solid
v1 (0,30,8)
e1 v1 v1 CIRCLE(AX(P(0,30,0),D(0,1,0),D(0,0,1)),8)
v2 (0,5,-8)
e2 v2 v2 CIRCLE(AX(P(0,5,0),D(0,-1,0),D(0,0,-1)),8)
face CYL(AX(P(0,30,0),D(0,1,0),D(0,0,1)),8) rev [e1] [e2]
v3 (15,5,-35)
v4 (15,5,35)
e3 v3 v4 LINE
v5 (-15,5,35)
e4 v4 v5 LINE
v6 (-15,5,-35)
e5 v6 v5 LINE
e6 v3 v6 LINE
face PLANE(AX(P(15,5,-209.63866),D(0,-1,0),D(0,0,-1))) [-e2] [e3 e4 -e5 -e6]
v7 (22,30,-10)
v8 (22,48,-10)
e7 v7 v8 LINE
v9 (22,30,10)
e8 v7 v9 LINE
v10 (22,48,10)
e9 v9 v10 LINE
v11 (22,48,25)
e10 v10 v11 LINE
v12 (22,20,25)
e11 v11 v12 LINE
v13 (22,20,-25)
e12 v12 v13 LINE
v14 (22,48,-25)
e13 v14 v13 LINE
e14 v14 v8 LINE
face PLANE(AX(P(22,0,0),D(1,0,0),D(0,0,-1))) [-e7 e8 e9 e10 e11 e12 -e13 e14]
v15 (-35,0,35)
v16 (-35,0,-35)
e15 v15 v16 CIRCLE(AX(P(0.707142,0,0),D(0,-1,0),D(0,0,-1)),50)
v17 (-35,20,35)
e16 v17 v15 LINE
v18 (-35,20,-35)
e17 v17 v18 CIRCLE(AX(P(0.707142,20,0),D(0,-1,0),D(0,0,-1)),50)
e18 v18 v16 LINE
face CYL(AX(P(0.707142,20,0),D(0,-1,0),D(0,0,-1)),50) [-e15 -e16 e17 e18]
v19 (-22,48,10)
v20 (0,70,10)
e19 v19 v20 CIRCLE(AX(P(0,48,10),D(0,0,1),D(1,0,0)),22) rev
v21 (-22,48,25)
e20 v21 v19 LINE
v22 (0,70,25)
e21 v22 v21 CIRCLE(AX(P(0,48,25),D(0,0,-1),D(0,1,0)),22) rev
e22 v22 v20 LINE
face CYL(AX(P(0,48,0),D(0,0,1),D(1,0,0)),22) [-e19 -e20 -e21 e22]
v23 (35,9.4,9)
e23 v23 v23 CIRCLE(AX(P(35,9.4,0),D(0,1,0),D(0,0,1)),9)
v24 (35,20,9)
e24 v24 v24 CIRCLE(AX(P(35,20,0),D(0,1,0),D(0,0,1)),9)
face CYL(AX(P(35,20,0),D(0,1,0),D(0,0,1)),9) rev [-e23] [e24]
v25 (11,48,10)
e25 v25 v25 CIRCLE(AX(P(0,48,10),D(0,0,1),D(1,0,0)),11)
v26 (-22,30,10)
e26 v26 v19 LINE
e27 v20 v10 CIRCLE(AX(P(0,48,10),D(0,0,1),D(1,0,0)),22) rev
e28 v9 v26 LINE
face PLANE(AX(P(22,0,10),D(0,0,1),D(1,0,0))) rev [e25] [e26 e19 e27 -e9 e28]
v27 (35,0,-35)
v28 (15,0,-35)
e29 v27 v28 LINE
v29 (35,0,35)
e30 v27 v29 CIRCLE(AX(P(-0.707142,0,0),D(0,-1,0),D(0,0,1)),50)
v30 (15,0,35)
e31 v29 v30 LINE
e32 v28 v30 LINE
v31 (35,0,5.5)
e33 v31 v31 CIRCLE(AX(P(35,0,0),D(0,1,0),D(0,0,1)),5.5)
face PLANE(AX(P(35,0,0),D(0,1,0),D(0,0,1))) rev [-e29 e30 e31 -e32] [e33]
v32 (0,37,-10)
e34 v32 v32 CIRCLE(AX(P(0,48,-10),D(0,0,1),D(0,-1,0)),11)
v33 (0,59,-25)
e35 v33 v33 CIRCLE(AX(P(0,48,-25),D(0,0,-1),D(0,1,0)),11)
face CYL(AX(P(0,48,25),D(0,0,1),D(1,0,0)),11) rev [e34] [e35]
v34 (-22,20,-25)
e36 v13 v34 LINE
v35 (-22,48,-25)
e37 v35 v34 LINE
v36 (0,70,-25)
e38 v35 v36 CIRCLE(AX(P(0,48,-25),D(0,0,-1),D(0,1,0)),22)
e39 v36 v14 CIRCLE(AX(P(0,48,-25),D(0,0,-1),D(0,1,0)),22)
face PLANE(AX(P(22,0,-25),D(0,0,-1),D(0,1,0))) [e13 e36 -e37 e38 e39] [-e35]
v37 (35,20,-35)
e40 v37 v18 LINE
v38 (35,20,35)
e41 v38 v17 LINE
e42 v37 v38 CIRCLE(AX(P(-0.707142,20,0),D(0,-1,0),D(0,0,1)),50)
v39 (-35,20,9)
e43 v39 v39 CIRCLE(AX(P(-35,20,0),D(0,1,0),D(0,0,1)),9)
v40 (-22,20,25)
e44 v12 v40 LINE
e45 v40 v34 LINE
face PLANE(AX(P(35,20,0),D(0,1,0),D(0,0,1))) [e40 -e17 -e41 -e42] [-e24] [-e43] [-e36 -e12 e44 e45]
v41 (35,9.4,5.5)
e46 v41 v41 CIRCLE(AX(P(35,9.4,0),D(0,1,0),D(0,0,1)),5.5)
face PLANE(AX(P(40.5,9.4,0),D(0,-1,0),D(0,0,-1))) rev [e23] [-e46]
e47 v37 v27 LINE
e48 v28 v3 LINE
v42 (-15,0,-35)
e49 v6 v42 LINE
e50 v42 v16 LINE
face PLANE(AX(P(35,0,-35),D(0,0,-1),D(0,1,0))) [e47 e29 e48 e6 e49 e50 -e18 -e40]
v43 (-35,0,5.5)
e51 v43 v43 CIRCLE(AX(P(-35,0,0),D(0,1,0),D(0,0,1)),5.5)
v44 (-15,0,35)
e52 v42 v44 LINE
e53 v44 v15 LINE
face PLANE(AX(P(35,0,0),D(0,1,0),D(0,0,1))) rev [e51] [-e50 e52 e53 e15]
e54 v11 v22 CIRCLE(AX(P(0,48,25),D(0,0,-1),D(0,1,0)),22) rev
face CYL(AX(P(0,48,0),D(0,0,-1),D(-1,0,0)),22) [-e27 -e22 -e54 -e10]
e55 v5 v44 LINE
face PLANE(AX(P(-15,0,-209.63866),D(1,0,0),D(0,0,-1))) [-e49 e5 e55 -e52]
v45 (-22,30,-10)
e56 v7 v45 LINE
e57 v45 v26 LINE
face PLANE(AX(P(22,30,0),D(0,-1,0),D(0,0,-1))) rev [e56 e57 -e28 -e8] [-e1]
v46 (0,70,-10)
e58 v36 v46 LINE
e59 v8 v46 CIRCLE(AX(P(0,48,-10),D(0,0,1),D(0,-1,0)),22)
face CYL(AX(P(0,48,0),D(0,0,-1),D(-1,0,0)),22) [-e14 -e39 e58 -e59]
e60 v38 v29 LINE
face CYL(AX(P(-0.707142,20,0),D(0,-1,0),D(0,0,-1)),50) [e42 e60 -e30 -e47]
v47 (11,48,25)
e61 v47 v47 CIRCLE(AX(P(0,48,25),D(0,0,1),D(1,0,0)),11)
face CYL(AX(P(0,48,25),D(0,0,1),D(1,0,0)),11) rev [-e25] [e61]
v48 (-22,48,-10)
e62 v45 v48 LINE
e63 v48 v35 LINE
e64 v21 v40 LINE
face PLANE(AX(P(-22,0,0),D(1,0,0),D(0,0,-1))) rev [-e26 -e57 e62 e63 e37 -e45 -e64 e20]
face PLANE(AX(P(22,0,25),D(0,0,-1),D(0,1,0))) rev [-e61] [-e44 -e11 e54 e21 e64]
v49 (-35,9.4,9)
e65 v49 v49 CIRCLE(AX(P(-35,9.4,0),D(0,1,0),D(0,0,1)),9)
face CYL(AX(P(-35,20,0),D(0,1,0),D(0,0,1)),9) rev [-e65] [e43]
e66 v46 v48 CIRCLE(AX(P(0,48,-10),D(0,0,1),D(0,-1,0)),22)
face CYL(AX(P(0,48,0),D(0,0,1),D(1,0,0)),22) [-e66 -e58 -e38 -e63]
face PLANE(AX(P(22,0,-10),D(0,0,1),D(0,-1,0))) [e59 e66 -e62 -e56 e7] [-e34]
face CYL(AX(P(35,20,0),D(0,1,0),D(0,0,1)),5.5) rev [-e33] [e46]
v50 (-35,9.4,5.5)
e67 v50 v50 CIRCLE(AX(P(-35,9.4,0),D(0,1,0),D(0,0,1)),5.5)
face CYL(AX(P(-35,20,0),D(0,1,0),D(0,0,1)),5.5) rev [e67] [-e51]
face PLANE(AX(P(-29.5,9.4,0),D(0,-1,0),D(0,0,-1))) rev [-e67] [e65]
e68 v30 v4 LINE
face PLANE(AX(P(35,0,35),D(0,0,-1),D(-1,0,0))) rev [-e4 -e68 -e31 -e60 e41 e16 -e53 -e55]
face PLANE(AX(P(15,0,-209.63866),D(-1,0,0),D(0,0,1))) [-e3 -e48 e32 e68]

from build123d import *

# Parameters (mm, degrees)
ESTRUSIONE_ESTRUSIONE1_DEPTH                         = 35
ESTRUSIONE_ESTRUSIONE2_DEPTH                         = 22
ESTRUSIONE_ESTRUSIONE3_DEPTH                         = 20
TAGLIO_ESTRUSIONE1_DEPTH                             = 111.588362117
TAGLIO_ESTRUSIONE1_DEPTH_BACK                        = 111.588362117
SCHIZZO3_W                                           = 30
SCHIZZO3_H                                           = 5
FORO_22_0_22_1_D                                     = 22
FORO_LAMATO_PER_VITE_M10_A_TESTA_CILINDR_D           = 11
FORO_LAMATO_PER_VITE_M10_A_TESTA_CILINDR_CBORE_D     = 18
FORO_LAMATO_PER_VITE_M10_A_TESTA_CILINDR_CBORE_DEPTH = 10.6
FORO_16_0_16_1_D                                     = 16
RACCORDO1_R                                          = 22


with BuildPart() as part:
    # Schizzo1 → Estrusione-Estrusione1 (new, symmetric)
    with BuildSketch(Plane(origin=(0, 0, 0), x_dir=(0, 0, -1), z_dir=(1, 0, 0))):
        Polygon((0, 0), (0, 20), (-25, 20), (-35, 20), (-35, 0), align=None)
        Polygon((25, 20), (0, 20), (0, 0), (35, 0), (35, 20), align=None)
    extrude(amount=ESTRUSIONE_ESTRUSIONE1_DEPTH, both=True)

    # Schizzo1<3> → Estrusione-Estrusione2 (add, symmetric)
    with BuildSketch(Plane(origin=(0, 0, 0), x_dir=(0, 0, -1), z_dir=(1, 0, 0))):
        Polygon((0, 20), (0, 30), (-10, 30), (-10, 70), (-25, 70), (-25, 20), align=None)
        Polygon((10, 30), (0, 30), (0, 20), (25, 20), (25, 70), (10, 70), align=None)
    extrude(amount=ESTRUSIONE_ESTRUSIONE2_DEPTH, both=True)

    # Schizzo2 → Estrusione-Estrusione3 (add)
    with BuildSketch(Plane.XZ):
        with BuildLine():
            Line((-35, 35), (-35, -35))
            ThreePointArc((-35, -35), (-49.292857857, 0), (-35, 35))
        make_face()
        with BuildLine():
            Line((35, 35), (35, -35))
            ThreePointArc((35, -35), (49.292857857, 0), (35, 35))
        make_face()
    extrude(amount=-ESTRUSIONE_ESTRUSIONE3_DEPTH)

    # Schizzo3 → Taglio-Estrusione1 (cut, two sides: drawn at the far end of the back side and taken through both)
    with BuildSketch(Plane(origin=(0, 0, -35), x_dir=(-1, 0, 0), z_dir=(0, 0, -1)).offset(-TAGLIO_ESTRUSIONE1_DEPTH_BACK)):
        with Locations((0, 2.5)):
            Rectangle(SCHIZZO3_W, SCHIZZO3_H)
    extrude(amount=TAGLIO_ESTRUSIONE1_DEPTH + TAGLIO_ESTRUSIONE1_DEPTH_BACK, mode=Mode.SUBTRACT)

    # Foro Ø22.0 (22)-1 (through all)
    with Locations(Plane.XY.offset(25)):
        with Locations((0, 48)):
            Hole(FORO_22_0_22_1_D / 2)

    # Foro lamato per Vite M10 a testa cilindrica-1 (through all)
    with Locations(Plane(origin=(0, 20, 0), x_dir=(1, 0, 0), z_dir=(0, 1, 0))):
        with Locations((35, 0), (-35, 0)):
            CounterBoreHole(FORO_LAMATO_PER_VITE_M10_A_TESTA_CILINDR_D / 2, FORO_LAMATO_PER_VITE_M10_A_TESTA_CILINDR_CBORE_D / 2, FORO_LAMATO_PER_VITE_M10_A_TESTA_CILINDR_CBORE_DEPTH)

    # Foro Ø16.0 (16)-1 (through all)
    with Locations(Plane(origin=(0, 30, 0), x_dir=(1, 0, 0), z_dir=(0, 1, 0))):
        with Locations((0, 0)):
            Hole(FORO_16_0_16_1_D / 2)

    # Raccordo1
    raccordo1_edges = [part.edges().sort_by_distance(p)[0] for p in [
        (-22, 70, 17.5),
        (22, 70, 17.5),
        (-22, 70, -17.5),
        (22, 70, -17.5),
    ]]
    fillet(raccordo1_edges, radius=RACCORDO1_R - 0.0001)  # a hair under: the kernel refuses the full size


solid = part.part
